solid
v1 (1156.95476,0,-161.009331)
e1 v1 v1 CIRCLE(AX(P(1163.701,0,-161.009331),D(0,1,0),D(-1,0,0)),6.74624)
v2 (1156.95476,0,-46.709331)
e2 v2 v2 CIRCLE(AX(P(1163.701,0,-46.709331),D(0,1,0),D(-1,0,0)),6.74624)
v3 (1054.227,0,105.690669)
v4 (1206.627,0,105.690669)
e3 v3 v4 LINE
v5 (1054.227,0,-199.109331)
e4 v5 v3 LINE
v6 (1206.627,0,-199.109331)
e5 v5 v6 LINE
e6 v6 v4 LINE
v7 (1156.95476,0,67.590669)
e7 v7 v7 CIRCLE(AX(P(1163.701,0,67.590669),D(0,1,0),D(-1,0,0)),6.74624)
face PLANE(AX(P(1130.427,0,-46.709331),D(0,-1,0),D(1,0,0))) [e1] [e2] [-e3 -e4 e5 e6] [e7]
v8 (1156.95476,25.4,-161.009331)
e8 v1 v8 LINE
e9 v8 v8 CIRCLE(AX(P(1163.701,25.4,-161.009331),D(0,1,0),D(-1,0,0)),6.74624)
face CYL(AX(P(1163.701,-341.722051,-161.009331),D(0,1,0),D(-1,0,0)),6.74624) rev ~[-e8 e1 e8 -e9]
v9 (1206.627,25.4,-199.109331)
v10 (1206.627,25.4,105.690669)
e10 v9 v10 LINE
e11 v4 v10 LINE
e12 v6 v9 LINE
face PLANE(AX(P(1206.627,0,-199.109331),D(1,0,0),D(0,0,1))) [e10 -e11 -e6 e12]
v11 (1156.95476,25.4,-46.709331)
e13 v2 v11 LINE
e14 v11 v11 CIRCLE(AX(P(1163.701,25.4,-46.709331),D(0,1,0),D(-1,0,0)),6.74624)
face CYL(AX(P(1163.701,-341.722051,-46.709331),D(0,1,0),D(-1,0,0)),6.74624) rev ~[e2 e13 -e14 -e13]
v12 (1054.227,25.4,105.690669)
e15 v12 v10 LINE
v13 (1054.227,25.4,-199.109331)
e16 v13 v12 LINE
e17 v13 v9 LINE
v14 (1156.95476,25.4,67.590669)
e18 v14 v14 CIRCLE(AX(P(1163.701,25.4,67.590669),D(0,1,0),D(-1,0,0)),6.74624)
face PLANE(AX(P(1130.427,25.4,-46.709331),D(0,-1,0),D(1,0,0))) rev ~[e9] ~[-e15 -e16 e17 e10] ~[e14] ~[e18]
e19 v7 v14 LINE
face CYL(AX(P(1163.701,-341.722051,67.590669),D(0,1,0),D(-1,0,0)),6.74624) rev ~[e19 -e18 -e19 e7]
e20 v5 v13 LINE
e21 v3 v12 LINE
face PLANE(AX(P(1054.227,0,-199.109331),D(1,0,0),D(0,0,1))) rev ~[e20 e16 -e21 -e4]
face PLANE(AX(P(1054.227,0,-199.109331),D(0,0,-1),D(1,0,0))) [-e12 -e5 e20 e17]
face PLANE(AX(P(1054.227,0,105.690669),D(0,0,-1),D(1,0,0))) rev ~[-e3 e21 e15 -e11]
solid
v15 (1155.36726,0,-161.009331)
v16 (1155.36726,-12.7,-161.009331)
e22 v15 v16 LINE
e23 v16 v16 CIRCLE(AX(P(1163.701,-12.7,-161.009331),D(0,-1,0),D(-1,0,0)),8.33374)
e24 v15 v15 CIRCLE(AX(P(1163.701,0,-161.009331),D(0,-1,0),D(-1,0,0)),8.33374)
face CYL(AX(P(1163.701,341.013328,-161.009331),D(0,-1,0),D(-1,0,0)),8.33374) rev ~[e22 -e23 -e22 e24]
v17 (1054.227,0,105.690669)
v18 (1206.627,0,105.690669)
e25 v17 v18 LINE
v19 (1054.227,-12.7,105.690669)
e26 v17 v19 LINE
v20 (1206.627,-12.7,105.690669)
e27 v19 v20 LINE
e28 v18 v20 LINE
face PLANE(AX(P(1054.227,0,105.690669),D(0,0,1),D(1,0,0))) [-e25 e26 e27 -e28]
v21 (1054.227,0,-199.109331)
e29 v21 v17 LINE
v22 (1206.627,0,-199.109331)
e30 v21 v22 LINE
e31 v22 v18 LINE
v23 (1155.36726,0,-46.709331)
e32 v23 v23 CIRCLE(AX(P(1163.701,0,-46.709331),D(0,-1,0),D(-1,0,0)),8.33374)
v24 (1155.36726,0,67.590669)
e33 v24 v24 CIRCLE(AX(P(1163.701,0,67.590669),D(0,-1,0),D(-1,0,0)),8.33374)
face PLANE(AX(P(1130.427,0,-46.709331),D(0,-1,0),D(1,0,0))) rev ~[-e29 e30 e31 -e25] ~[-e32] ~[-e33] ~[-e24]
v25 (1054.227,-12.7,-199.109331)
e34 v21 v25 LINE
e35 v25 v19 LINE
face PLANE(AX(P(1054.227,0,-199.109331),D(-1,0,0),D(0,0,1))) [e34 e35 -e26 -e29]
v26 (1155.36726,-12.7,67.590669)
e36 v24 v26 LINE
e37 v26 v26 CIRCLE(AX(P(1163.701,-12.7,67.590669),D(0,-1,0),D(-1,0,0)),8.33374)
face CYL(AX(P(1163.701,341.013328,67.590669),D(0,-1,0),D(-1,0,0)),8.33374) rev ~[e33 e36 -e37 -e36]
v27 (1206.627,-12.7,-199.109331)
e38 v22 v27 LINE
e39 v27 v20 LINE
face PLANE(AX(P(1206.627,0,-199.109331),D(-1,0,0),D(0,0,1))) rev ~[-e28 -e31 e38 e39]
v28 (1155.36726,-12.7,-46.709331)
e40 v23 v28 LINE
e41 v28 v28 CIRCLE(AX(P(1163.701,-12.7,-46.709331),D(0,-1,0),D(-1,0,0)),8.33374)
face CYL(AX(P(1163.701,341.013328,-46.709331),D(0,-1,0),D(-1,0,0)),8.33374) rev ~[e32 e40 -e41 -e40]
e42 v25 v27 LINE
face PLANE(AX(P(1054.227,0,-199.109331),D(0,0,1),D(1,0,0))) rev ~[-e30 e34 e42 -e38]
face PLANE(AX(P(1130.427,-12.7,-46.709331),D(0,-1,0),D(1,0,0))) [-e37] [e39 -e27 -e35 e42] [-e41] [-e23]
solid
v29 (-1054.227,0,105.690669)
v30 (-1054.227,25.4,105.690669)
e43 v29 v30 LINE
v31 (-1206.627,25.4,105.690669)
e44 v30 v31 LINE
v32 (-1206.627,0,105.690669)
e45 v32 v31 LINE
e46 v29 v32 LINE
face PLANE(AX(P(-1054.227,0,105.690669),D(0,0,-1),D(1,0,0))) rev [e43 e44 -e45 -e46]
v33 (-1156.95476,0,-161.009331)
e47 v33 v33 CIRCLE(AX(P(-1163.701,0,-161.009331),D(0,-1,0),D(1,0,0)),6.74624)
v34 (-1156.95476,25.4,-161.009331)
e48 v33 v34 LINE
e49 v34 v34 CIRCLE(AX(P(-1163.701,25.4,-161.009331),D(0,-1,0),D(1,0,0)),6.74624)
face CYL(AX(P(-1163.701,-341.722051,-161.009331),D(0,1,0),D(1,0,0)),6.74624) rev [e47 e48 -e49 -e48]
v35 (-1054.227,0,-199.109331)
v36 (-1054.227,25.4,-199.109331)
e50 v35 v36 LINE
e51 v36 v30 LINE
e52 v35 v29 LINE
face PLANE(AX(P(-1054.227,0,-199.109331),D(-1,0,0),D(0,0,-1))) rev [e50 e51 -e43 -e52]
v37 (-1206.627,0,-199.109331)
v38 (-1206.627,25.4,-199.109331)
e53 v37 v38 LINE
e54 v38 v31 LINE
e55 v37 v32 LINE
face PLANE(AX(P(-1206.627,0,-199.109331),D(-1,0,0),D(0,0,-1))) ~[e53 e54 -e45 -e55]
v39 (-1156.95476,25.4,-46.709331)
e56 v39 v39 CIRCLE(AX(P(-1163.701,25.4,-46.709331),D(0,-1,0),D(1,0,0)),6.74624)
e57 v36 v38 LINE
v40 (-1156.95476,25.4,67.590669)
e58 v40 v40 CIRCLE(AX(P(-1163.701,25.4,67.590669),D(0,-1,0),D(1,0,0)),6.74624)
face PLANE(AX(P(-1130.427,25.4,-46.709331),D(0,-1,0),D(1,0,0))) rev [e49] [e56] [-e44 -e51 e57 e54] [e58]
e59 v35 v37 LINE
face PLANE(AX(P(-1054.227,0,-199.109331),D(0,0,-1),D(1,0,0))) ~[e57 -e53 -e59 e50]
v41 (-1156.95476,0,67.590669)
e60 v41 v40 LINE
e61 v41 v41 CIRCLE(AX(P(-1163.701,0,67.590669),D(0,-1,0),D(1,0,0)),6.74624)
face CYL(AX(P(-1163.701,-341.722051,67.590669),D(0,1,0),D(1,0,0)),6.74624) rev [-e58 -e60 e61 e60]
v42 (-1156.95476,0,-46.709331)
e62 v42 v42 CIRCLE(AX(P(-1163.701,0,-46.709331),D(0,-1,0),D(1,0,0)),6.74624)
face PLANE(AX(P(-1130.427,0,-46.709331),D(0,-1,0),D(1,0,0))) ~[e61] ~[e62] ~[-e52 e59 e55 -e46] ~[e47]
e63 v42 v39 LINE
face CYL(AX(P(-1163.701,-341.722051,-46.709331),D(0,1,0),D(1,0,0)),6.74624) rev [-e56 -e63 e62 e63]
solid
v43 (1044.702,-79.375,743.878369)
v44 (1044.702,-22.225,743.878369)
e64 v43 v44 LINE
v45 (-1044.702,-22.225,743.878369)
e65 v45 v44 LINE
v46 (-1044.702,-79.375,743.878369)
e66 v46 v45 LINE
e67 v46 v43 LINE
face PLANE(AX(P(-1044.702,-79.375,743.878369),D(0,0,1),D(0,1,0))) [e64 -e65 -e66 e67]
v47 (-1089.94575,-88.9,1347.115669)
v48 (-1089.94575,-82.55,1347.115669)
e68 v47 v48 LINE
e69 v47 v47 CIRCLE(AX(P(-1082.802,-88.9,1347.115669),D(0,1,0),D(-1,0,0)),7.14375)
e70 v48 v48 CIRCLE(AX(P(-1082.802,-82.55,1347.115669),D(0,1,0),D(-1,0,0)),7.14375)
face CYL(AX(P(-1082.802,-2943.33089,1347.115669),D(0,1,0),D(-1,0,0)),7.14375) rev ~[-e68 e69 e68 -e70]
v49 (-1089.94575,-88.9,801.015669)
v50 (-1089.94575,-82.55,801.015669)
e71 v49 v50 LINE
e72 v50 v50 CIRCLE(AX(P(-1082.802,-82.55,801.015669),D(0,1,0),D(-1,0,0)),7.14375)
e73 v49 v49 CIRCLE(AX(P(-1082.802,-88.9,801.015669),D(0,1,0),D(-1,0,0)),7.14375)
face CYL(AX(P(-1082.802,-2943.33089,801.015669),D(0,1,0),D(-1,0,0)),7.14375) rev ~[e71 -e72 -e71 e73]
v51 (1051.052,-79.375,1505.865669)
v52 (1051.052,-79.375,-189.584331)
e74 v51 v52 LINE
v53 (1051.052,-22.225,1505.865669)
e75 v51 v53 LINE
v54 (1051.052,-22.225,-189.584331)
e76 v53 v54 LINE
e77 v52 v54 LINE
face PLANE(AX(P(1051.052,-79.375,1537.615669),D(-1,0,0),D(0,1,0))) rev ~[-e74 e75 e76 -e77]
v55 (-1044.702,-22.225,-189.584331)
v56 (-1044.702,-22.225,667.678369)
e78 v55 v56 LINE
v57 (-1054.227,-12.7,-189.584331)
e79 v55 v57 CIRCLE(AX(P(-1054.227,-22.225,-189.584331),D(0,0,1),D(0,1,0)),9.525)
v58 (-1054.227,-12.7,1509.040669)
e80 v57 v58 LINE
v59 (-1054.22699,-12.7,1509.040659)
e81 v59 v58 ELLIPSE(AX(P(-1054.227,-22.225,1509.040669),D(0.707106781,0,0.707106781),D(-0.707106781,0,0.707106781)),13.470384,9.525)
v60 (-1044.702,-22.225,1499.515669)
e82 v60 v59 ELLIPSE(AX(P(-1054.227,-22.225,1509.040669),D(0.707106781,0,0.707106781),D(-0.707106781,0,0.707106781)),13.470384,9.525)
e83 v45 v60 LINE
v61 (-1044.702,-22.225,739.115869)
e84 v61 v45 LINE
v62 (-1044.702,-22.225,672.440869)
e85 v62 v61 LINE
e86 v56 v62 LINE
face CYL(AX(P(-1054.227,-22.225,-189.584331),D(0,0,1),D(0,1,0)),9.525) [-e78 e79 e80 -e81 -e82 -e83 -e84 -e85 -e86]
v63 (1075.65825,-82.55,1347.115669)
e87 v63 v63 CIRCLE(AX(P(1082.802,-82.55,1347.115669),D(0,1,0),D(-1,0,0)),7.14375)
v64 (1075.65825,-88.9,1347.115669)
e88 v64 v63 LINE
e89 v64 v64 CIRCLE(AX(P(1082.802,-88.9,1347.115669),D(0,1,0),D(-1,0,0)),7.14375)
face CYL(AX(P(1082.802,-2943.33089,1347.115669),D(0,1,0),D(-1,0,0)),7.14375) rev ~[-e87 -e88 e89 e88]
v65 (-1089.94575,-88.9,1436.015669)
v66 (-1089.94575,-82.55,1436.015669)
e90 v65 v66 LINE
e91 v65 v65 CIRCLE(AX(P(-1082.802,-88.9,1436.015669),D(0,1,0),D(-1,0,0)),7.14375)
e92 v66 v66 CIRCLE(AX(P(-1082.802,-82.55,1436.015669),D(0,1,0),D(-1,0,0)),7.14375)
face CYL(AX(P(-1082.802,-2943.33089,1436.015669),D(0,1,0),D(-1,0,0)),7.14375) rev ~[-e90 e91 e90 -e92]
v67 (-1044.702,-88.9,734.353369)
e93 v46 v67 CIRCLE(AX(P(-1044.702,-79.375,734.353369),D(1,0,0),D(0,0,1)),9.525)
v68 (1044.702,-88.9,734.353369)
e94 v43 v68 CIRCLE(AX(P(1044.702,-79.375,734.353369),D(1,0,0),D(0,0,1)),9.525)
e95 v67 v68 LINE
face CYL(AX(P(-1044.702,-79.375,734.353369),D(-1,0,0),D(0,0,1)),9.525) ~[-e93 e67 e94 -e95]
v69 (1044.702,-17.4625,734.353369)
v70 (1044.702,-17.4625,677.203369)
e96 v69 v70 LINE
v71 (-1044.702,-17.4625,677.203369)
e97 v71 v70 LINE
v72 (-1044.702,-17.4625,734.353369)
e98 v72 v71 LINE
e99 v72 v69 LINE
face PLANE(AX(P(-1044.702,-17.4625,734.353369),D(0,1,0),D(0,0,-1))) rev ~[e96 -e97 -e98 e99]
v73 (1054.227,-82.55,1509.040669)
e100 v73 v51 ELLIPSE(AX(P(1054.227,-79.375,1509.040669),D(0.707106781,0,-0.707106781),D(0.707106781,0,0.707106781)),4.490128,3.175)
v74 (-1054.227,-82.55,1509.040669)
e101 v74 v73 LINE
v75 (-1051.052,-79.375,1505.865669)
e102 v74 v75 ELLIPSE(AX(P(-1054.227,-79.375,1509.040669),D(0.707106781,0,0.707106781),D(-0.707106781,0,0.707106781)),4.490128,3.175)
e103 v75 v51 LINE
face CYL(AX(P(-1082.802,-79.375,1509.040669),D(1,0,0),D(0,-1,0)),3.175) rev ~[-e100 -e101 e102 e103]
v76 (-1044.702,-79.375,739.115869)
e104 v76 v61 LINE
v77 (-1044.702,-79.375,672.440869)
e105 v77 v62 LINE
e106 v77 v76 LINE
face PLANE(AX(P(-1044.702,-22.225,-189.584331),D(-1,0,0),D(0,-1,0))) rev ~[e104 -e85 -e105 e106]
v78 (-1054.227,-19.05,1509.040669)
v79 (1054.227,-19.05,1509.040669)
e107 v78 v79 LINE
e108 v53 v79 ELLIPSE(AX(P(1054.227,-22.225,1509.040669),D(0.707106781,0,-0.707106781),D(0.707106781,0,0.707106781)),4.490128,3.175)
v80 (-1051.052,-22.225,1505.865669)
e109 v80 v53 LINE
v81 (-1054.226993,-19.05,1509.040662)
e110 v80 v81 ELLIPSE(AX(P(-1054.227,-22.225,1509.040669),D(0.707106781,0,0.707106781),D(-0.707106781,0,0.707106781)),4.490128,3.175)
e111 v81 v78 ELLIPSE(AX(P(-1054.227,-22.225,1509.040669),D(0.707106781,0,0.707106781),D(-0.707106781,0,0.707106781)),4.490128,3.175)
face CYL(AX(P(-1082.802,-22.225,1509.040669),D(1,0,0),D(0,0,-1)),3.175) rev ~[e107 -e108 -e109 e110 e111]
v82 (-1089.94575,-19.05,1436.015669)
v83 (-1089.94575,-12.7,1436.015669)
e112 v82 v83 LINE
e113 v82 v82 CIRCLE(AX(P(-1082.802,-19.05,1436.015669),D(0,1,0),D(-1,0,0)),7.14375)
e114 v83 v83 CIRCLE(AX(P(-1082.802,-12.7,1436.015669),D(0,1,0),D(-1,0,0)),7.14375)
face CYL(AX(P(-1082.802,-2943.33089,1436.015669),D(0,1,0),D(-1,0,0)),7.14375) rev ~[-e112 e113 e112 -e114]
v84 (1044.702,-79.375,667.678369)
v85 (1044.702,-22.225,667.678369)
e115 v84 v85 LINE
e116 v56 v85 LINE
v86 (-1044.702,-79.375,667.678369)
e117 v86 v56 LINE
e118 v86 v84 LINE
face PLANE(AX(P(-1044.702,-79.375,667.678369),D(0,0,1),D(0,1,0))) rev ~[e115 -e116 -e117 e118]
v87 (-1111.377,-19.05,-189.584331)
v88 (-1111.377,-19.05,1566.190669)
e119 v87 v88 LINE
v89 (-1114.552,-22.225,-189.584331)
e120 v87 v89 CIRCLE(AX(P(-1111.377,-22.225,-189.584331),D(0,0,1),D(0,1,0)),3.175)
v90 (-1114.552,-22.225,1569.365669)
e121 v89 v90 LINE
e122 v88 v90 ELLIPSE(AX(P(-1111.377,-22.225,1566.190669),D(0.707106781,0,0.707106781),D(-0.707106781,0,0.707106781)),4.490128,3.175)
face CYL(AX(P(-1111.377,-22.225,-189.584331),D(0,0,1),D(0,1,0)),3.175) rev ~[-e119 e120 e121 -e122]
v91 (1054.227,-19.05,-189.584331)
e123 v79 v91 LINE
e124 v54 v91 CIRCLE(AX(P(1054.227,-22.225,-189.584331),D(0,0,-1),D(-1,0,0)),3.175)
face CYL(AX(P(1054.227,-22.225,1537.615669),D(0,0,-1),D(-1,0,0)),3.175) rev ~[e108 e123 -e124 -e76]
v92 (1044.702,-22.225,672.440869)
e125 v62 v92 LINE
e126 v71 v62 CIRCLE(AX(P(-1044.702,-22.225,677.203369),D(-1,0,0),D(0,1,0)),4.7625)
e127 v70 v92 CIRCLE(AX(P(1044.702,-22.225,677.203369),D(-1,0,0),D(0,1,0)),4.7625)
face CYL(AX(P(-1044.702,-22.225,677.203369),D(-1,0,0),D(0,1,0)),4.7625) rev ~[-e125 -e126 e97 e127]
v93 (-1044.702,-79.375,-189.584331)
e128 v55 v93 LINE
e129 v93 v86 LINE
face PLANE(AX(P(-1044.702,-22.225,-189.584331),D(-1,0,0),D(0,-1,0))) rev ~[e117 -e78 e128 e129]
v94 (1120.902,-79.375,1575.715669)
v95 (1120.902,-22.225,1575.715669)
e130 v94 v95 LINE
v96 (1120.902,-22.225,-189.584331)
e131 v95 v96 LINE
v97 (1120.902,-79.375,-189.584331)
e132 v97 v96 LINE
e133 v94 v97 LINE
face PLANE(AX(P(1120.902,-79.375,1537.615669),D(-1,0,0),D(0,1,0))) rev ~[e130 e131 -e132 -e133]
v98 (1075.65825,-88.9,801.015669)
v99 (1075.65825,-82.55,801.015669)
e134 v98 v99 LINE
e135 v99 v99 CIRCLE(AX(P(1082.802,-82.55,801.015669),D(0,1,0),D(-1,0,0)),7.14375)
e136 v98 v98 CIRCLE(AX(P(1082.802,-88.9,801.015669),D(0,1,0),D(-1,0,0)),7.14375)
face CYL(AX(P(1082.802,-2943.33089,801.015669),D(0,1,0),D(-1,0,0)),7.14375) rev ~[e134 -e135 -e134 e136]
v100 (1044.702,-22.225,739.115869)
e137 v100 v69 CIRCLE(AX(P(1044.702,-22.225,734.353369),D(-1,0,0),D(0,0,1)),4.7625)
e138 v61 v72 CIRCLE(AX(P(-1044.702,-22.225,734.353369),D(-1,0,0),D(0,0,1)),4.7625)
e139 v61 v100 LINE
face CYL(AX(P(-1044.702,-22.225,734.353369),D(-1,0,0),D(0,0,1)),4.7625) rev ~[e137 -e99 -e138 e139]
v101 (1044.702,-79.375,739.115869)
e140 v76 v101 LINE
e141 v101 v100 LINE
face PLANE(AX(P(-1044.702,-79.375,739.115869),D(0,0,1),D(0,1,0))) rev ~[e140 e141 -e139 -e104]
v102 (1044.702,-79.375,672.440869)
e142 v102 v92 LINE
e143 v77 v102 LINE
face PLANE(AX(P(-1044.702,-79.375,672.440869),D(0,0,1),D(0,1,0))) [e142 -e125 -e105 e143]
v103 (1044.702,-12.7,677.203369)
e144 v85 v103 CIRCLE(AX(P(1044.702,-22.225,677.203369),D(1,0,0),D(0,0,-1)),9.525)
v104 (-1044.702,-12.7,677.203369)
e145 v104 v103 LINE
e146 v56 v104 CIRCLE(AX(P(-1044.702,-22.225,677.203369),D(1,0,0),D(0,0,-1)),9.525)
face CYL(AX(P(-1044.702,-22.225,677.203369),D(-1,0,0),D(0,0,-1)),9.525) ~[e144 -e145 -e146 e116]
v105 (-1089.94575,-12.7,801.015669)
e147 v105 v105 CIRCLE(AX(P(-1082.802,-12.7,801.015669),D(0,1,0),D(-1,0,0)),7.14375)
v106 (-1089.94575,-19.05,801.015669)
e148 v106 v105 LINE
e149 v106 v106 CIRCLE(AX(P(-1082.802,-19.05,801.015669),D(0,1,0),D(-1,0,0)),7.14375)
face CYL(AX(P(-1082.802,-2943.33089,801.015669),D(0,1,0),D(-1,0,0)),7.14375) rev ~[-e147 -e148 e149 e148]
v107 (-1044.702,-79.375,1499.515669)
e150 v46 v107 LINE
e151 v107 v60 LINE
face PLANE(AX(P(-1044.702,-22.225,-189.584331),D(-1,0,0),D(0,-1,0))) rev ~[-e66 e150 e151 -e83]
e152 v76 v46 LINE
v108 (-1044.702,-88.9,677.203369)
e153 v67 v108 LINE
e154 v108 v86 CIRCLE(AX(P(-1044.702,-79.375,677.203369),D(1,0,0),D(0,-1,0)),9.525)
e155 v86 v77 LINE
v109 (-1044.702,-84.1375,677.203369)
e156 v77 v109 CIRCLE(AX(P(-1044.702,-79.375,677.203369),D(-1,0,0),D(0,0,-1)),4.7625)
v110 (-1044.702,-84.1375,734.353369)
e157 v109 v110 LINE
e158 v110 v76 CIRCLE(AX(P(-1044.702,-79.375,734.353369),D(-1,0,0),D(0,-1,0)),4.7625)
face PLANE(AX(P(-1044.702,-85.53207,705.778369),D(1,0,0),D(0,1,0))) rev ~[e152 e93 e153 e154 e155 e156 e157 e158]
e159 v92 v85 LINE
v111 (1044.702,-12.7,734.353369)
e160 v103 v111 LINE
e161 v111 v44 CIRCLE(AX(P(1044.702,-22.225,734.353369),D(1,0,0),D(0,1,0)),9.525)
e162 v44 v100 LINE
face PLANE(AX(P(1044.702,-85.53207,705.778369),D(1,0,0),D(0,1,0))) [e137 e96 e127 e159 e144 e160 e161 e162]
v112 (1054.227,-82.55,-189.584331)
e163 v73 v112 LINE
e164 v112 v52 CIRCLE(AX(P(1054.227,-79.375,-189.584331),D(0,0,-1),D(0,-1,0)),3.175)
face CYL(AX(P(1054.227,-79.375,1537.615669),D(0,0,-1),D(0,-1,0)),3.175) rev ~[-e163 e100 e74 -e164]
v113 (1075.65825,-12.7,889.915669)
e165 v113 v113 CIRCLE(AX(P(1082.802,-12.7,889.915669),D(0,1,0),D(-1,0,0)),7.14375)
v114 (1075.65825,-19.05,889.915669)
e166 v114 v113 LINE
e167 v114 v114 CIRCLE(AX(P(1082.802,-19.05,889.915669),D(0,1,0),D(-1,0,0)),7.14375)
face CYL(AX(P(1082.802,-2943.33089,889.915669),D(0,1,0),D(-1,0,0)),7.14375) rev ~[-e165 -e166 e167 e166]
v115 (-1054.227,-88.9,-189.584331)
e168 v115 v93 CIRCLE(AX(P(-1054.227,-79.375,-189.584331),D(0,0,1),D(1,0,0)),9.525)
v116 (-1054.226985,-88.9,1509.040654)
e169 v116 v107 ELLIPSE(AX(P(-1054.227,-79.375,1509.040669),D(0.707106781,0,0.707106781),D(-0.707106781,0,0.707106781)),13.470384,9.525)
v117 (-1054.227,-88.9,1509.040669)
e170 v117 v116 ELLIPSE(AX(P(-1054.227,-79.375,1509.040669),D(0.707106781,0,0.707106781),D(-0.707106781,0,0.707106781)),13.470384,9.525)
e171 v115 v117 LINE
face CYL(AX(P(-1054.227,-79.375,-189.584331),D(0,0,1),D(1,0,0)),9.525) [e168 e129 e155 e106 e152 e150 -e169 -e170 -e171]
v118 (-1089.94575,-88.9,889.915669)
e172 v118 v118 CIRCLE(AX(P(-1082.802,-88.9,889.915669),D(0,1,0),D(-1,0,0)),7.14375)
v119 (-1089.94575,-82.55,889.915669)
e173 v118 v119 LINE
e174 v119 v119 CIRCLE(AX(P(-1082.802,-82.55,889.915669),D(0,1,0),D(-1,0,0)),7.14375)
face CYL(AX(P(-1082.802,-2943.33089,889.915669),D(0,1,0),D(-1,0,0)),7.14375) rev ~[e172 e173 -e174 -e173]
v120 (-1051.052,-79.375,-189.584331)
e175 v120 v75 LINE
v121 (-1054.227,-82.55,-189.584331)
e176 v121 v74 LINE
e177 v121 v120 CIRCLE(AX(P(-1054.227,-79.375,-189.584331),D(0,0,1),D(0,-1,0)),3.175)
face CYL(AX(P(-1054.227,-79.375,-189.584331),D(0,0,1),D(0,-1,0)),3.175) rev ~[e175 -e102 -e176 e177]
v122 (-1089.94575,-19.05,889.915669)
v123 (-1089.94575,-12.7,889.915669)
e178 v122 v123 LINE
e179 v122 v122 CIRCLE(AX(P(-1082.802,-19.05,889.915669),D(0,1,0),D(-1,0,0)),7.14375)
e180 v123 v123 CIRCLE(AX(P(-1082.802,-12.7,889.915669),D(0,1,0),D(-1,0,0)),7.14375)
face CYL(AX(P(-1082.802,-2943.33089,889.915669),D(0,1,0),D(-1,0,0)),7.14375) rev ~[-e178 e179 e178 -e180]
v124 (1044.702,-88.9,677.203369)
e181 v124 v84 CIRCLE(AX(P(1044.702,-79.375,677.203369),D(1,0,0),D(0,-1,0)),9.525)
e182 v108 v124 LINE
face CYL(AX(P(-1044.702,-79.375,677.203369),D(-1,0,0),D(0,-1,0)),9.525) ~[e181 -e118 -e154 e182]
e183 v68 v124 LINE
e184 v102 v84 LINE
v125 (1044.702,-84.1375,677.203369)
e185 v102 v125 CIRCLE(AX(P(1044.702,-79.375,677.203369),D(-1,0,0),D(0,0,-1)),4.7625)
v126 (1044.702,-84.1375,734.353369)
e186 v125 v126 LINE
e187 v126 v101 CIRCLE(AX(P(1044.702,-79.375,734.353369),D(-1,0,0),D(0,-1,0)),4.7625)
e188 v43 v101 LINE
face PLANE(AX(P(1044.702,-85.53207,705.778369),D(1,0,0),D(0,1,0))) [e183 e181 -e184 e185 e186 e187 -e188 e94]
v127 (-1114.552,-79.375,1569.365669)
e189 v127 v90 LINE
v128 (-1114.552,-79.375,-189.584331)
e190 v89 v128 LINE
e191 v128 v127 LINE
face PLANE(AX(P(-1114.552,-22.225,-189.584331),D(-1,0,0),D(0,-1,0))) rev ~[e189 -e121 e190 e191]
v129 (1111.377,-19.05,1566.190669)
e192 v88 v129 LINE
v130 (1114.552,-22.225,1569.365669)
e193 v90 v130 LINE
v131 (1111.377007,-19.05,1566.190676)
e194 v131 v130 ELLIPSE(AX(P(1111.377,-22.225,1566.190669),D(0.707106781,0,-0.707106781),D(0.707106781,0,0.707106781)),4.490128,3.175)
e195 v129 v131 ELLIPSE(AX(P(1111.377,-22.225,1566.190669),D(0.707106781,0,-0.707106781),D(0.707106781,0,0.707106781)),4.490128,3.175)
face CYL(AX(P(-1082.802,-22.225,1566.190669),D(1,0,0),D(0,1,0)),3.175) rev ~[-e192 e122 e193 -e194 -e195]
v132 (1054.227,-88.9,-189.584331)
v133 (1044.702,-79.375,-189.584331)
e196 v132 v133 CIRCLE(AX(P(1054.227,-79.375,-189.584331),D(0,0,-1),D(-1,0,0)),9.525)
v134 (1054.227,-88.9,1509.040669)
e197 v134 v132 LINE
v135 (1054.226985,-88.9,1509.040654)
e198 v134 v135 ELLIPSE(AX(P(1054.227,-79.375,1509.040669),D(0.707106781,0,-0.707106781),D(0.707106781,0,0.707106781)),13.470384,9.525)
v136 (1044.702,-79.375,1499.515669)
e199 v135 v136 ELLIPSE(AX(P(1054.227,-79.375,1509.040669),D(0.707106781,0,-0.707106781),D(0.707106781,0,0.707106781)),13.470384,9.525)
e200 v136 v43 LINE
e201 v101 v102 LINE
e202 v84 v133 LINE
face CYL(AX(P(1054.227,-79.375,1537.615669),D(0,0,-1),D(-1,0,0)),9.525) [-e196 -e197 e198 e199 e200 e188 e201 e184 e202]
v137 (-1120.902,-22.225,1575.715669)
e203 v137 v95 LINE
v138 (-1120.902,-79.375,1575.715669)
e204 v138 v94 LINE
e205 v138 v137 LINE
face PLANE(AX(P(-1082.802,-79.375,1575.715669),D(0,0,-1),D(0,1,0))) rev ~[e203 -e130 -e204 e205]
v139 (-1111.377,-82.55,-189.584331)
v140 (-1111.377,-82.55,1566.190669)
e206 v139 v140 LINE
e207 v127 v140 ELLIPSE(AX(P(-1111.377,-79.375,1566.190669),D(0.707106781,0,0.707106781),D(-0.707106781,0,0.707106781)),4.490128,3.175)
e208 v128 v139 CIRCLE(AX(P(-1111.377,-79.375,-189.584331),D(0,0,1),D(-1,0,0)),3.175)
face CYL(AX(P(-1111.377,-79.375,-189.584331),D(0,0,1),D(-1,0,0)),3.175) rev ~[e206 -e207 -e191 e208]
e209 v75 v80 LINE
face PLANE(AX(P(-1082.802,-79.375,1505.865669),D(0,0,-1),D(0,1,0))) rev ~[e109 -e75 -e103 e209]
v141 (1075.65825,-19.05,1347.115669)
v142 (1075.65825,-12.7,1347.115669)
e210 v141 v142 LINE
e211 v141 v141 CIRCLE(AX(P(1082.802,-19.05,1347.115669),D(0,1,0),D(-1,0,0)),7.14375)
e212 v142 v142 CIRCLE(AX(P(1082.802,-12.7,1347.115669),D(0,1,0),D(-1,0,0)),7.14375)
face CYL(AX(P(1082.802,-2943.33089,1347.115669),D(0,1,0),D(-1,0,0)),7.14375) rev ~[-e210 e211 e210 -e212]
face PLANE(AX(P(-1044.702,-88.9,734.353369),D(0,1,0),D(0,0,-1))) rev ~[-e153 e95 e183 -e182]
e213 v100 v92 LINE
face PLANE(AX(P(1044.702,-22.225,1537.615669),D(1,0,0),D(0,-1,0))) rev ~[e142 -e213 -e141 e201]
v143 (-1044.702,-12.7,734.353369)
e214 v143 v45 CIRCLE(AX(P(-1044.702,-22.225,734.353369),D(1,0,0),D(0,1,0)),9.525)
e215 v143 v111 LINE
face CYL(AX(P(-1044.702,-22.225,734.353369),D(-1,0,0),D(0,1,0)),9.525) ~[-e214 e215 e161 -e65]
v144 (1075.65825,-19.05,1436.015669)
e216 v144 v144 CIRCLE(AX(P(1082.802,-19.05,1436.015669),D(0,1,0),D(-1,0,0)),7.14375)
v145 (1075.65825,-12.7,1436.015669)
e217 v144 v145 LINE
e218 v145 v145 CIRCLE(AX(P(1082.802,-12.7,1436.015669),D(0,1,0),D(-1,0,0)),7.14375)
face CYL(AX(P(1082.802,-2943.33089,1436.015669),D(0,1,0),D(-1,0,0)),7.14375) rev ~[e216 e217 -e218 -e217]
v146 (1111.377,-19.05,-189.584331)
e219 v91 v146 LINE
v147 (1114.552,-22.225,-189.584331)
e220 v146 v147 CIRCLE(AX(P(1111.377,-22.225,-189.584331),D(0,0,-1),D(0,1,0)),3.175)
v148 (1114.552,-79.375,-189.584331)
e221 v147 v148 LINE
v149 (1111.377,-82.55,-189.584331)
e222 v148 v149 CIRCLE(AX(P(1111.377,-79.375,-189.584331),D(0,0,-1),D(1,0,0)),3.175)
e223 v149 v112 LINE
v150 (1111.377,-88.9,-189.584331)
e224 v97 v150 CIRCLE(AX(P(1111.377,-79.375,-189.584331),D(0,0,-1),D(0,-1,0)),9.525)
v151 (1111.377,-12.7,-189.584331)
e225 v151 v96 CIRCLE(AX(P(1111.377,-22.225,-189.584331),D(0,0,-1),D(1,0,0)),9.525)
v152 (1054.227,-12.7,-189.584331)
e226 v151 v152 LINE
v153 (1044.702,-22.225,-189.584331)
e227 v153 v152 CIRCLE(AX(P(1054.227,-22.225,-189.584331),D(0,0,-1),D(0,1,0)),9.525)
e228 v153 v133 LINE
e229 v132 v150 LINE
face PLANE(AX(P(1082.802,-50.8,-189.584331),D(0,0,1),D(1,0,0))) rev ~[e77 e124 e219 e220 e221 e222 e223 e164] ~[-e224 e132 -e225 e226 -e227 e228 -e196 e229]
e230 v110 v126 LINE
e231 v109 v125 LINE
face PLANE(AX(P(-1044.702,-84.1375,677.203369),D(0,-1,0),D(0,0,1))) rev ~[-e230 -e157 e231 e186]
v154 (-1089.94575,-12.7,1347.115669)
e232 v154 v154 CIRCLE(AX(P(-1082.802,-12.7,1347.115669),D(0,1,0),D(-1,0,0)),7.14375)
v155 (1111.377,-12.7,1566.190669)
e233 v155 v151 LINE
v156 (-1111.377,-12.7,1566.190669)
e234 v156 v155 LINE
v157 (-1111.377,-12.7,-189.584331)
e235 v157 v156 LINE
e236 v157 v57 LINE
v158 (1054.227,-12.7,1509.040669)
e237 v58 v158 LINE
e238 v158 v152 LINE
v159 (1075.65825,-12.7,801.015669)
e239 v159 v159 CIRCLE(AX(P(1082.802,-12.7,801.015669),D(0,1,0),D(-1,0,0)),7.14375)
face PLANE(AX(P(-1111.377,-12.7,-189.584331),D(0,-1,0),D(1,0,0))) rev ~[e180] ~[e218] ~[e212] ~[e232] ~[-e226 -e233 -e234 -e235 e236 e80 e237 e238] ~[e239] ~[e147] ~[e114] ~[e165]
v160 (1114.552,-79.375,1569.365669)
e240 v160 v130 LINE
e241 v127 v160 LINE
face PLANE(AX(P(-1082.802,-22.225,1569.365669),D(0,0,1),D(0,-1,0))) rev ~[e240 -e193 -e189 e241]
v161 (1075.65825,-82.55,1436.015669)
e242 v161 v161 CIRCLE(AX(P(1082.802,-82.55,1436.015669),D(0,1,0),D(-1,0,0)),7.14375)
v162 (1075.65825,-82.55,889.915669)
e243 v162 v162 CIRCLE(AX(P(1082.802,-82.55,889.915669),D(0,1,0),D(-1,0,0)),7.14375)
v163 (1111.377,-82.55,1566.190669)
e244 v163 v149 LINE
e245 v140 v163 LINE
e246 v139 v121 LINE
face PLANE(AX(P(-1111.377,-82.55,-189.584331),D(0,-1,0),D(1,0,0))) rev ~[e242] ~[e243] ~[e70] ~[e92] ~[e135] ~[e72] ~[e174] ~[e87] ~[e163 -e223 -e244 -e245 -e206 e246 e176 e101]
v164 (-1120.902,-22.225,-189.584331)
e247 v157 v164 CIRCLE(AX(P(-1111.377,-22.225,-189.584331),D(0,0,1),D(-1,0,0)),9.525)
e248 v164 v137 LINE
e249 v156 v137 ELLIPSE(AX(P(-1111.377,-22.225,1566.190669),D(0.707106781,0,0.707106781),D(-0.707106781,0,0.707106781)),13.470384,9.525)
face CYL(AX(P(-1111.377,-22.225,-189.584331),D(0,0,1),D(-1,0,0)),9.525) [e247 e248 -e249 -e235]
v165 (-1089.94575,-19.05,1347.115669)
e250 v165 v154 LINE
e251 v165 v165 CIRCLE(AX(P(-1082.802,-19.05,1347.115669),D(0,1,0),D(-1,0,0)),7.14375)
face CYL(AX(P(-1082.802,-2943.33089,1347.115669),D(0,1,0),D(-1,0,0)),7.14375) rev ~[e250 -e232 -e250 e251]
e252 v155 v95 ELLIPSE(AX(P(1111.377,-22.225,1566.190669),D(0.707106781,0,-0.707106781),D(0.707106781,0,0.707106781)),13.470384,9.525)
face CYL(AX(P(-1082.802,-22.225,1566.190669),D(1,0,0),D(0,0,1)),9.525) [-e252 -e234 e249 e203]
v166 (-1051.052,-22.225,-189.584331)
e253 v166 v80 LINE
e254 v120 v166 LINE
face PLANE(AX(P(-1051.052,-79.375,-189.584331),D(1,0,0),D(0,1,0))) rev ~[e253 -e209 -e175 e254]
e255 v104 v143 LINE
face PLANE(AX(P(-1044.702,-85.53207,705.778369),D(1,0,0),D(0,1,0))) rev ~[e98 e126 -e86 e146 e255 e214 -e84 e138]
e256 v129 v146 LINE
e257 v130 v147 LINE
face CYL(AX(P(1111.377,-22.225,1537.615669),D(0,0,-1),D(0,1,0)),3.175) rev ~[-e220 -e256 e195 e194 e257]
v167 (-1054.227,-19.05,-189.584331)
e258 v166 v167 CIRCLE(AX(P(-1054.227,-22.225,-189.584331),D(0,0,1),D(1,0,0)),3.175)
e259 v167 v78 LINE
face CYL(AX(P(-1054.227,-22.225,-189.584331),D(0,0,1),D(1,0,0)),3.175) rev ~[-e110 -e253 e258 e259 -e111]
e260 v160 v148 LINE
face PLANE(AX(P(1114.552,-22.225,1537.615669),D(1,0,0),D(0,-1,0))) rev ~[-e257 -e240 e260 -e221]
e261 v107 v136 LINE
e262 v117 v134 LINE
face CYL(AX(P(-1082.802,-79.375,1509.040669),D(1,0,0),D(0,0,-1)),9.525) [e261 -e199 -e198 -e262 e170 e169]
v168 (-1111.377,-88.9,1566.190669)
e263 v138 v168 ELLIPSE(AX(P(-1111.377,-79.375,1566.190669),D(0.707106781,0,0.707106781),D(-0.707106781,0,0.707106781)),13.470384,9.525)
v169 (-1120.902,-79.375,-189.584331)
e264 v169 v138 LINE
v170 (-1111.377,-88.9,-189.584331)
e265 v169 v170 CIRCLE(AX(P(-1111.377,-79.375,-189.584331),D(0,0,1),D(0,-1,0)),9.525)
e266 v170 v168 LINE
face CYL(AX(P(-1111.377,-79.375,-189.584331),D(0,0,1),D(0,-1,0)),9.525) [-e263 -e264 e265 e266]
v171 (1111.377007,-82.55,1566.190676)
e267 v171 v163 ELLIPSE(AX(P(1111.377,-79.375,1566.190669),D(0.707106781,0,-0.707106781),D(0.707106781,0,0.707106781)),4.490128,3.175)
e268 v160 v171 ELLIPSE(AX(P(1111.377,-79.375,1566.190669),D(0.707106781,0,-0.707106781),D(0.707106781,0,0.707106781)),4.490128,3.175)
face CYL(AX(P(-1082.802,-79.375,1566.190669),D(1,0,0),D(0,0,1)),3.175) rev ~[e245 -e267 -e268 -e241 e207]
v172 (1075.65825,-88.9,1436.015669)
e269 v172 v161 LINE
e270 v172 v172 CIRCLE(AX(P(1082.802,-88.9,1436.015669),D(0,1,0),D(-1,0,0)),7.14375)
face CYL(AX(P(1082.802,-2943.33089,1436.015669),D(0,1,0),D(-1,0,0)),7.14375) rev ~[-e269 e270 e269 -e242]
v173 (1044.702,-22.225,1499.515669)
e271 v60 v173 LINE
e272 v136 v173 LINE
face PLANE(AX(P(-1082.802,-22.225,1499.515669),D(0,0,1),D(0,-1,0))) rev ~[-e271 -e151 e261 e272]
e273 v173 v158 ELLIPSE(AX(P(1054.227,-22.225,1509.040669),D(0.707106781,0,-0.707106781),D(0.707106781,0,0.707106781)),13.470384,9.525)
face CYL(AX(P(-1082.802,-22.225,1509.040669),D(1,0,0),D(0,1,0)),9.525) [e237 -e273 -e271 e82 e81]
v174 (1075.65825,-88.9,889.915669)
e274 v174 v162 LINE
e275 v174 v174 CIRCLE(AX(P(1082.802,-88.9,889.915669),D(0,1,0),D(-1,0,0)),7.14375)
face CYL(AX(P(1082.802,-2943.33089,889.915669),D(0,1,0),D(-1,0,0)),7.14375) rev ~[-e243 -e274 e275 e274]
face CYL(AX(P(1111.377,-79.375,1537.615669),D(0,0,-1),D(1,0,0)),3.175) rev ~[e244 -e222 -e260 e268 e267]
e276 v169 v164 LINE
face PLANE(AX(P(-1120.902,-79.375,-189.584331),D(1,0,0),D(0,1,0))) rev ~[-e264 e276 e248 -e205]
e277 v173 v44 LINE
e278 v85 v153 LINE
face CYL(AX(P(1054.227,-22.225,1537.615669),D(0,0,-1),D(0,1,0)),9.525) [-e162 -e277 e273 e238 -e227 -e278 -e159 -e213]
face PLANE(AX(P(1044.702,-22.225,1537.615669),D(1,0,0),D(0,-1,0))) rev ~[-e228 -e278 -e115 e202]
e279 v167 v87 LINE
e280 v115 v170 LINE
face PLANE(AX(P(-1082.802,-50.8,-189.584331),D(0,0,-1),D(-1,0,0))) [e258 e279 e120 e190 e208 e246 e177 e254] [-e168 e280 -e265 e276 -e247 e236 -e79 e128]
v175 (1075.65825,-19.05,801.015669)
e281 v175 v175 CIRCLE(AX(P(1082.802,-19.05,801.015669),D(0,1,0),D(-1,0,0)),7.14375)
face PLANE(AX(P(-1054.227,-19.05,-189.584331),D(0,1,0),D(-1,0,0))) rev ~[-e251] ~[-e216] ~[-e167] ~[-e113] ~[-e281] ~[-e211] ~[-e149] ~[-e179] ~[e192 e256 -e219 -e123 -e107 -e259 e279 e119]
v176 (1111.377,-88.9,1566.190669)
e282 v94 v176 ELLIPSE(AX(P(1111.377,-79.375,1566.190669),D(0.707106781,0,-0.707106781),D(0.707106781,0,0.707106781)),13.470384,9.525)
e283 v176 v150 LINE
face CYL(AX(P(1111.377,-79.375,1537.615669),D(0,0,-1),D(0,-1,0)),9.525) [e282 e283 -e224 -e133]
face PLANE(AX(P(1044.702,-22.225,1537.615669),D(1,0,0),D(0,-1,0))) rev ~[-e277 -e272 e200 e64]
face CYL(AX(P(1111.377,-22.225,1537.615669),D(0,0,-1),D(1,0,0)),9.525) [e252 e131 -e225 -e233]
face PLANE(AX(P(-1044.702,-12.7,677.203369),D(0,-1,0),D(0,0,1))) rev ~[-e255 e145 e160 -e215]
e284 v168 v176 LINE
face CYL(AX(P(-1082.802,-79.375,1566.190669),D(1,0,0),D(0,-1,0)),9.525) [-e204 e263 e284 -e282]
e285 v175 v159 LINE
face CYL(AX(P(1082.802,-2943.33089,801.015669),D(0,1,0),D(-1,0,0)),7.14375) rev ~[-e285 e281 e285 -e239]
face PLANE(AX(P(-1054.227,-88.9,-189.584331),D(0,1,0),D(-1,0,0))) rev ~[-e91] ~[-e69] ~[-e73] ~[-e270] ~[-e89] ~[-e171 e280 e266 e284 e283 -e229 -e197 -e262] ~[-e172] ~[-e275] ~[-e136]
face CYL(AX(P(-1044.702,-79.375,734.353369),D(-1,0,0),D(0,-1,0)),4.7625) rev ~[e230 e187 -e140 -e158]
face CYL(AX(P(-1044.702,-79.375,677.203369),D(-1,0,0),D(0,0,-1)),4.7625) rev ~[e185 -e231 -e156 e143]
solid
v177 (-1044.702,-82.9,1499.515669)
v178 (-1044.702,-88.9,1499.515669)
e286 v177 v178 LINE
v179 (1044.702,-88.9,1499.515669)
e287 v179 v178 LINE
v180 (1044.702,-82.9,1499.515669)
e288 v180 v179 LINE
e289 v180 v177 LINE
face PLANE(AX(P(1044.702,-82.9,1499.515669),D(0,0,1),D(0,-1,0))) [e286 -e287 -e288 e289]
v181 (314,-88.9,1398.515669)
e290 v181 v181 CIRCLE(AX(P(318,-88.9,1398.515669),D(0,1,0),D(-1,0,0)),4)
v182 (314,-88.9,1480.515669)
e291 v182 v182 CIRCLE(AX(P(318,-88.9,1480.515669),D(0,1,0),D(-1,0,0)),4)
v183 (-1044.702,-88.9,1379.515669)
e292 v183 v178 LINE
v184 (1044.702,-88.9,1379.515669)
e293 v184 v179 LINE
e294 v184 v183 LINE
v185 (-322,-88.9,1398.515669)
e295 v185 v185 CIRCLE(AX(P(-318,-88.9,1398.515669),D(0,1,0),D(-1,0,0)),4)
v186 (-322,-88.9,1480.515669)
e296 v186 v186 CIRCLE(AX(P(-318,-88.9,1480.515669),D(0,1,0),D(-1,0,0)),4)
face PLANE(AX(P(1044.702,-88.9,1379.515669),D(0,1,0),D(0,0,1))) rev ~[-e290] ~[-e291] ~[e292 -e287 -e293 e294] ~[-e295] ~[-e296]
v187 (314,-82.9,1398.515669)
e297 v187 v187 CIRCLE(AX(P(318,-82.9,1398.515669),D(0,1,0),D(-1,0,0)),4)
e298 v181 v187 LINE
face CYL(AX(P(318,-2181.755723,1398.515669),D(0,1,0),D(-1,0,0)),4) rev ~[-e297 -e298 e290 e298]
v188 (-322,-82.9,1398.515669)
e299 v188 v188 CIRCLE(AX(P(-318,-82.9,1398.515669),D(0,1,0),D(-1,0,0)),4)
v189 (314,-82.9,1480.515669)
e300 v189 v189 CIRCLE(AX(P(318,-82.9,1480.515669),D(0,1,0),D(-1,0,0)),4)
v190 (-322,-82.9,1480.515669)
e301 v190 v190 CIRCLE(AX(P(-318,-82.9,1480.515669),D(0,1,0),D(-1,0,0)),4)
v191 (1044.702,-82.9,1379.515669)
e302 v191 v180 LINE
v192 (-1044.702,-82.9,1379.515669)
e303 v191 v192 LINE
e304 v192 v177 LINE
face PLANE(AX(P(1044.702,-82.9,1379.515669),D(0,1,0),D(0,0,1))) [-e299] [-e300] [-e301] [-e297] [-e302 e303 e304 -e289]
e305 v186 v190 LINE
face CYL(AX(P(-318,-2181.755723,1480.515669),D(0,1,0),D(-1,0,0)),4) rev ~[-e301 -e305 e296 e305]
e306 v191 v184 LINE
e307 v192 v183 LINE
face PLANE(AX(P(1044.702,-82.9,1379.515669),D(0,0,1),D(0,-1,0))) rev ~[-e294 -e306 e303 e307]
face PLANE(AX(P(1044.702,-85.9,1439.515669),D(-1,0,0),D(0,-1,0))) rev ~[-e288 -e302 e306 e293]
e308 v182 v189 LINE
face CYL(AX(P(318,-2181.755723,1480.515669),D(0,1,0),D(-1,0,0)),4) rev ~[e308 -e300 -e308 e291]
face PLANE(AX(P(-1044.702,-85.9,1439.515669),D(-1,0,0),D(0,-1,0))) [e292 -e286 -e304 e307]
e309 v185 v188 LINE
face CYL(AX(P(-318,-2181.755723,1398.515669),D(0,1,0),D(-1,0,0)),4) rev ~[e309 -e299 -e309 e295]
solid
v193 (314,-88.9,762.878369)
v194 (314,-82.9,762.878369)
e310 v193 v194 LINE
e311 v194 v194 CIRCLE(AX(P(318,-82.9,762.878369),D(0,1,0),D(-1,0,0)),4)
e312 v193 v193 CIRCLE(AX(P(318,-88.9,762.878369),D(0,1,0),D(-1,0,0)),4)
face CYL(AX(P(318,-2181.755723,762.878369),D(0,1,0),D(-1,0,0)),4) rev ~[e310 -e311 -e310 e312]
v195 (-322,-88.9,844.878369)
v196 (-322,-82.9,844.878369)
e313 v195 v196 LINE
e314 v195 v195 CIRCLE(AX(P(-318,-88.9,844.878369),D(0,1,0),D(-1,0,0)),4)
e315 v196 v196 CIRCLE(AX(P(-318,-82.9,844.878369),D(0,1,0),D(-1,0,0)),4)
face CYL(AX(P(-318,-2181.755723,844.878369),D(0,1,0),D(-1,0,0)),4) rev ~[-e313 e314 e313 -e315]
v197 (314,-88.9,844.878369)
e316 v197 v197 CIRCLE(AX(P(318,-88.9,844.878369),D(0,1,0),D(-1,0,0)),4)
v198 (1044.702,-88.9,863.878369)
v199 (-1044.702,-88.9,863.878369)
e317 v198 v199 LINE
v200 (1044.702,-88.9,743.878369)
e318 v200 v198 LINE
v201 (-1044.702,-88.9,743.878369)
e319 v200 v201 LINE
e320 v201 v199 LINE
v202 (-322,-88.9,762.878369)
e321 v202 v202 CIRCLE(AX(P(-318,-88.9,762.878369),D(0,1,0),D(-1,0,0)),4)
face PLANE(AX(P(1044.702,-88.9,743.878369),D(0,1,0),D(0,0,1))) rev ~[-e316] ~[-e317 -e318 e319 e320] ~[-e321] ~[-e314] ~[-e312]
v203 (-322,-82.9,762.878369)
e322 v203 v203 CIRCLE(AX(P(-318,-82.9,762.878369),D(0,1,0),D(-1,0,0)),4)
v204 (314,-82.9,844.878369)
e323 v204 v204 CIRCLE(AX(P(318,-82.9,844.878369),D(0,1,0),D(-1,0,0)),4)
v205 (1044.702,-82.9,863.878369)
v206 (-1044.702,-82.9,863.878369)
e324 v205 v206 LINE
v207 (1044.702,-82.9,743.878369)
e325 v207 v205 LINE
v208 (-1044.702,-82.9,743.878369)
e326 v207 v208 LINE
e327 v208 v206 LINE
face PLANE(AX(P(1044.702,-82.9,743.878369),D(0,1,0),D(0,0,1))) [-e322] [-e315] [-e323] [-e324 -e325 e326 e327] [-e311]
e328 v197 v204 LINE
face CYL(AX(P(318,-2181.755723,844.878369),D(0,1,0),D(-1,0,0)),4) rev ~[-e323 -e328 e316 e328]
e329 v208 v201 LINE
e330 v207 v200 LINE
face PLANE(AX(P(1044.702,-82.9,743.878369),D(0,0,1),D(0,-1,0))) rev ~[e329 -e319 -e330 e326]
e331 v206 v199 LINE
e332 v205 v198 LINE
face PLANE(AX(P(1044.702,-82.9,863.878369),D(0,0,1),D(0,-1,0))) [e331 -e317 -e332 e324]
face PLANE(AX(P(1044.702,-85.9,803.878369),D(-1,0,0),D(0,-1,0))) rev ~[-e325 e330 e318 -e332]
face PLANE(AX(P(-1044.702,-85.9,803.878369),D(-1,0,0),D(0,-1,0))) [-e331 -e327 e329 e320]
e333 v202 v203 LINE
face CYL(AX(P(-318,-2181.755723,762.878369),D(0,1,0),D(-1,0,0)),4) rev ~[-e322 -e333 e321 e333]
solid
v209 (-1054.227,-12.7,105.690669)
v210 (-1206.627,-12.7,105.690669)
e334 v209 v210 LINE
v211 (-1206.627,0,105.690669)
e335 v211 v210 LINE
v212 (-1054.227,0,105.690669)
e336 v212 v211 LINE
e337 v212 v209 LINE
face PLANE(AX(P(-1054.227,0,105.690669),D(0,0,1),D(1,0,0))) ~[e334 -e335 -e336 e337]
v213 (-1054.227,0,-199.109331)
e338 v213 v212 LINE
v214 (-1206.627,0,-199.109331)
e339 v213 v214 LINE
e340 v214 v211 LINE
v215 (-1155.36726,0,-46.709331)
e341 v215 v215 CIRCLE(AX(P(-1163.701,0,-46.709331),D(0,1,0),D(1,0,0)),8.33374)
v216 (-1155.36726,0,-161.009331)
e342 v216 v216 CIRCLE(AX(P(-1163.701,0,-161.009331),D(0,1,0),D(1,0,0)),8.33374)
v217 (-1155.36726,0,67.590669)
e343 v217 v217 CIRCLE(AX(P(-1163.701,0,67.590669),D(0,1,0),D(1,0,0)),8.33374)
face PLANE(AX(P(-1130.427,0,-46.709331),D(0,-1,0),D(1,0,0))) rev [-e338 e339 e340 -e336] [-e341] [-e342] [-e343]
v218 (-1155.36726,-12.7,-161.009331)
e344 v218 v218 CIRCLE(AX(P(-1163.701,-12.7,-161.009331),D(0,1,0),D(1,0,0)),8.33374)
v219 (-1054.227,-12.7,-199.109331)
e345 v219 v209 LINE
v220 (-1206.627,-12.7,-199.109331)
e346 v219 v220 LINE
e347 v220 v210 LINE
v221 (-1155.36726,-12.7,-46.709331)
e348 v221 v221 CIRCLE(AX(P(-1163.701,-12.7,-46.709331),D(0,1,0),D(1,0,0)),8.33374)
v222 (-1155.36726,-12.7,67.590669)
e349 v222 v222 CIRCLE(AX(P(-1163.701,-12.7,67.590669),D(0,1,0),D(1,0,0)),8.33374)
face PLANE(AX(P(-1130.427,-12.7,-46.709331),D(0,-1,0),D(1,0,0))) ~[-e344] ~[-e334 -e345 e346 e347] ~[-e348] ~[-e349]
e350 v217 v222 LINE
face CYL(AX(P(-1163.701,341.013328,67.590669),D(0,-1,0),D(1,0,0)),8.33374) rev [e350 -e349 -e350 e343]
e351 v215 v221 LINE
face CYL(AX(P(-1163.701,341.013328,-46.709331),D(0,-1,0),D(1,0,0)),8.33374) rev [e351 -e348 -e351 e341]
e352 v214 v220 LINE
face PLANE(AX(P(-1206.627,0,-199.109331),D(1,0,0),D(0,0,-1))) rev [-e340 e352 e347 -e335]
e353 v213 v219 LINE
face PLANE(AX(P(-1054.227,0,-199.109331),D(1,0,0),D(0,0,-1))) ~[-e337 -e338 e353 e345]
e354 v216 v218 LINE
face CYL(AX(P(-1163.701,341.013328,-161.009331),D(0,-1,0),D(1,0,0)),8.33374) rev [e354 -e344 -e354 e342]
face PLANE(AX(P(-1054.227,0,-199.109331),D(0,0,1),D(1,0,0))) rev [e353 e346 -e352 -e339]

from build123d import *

# Parameters (mm, degrees)
F0_W      = 152.4
F0_H      = 304.8
F1_DEPTH  = 25.4
F3_D      = 13.49248
F4_W      = 152.4
F4_H      = 304.8
F5_DEPTH  = 12.7
F6_D      = 16.66748
F15_W     = 57.15
F15_H     = 4.7625
F16_DEPTH = 2089.404
F17_W     = 6
F17_H     = 120
F18_DEPTH = 2089.404
F20_D     = 8
F20_2_D   = 8
F22_D     = 14.2875


# Not quite as in the source:
# - a length typed as a fraction of an inch, garbled in the dataset ("3 / 203.2 mm" for 3/8 in), is restored


with BuildPart() as f1:
    # F0 (on Front) → F1 (new body)
    with BuildSketch(Plane.XZ):
        with Locations((1130.427, -46.7093307734)):
            Rectangle(F0_W, F0_H)
    extrude(amount=-F1_DEPTH)

    # F3 (through all)
    with Locations(Plane.XZ):
        with Locations((1163.701, 67.5906692266), (1163.701, -46.7093307734), (1163.701, -161.0093307734)):
            Hole(F3_D / 2)


with BuildPart() as f5:
    # F4 (on face) → F5 (new body)
    with BuildSketch(Plane.XZ):
        with Locations((1130.427, -46.7093307734)):
            Rectangle(F4_W, F4_H)
    extrude(amount=F5_DEPTH)

    # F6 (through all)
    with Locations(Plane(origin=(0, 0, 0), x_dir=(1, 0, 0), z_dir=(0, 1, 0))):
        with Locations((1163.701, -67.5906692266), (1163.701, 46.7093307734), (1163.701, 161.0093307734)):
            Hole(F6_D / 2)


with BuildPart() as f7_1:
    # F7: instance of F1
    add(f1.part.mirror(Plane.YZ))


with BuildPart() as f7_2:
    # F7: instance of F5
    add(f5.part.mirror(Plane.YZ))


with BuildPart() as f12:
    # F12: sweep along a path in F9
    with BuildLine(Plane.XZ.offset(50.8)) as f12_path:
        Line((-1082.802, -189.5843307734), (-1082.802, 1537.6156692266))
        Line((-1082.802, 1537.6156692266), (1082.802, 1537.6156692266))
        Line((1082.802, 1537.6156692266), (1082.802, -189.5843307734))
    # F11 (on offset) → F12 (sweep)
    with BuildSketch(Plane(origin=(0, 0, -189.5843307734), x_dir=(1, 0, 0), z_dir=(0, 0, -1))):
        with BuildLine():
            Line((-1054.227, 88.9), (-1111.377, 88.9))
            ThreePointArc((-1111.377, 88.9), (-1118.1121920908, 86.1101920908), (-1120.902, 79.375))
            Line((-1120.902, 79.375), (-1120.902, 22.225))
            ThreePointArc((-1120.902, 22.225), (-1118.1121920908, 15.4898079092), (-1111.377, 12.7))
            Line((-1111.377, 12.7), (-1054.227, 12.7))
            ThreePointArc((-1054.227, 12.7), (-1047.4918079092, 15.4898079092), (-1044.702, 22.225))
            Line((-1044.702, 22.225), (-1044.702, 79.375))
            ThreePointArc((-1044.702, 79.375), (-1047.4918079092, 86.1101920908), (-1054.227, 88.9))
        make_face()
        with BuildLine():
            ThreePointArc((-1114.552, 79.375), (-1113.6220640303, 81.6200640303), (-1111.377, 82.55))
            Line((-1111.377, 82.55), (-1054.227, 82.55))
            ThreePointArc((-1054.227, 82.55), (-1051.9819359697, 81.6200640303), (-1051.052, 79.375))
            Line((-1051.052, 79.375), (-1051.052, 22.225))
            ThreePointArc((-1051.052, 22.225), (-1051.9819359697, 19.9799359697), (-1054.227, 19.05))
            Line((-1054.227, 19.05), (-1111.377, 19.05))
            ThreePointArc((-1111.377, 19.05), (-1113.6220640303, 19.9799359697), (-1114.552, 22.225))
            Line((-1114.552, 22.225), (-1114.552, 79.375))
        make_face(mode=Mode.SUBTRACT)
    sweep(path=f12_path.line, transition=Transition.RIGHT)

    # F15 (on face) → F16 (join, through all)
    with BuildSketch(Plane.YZ.offset(-1044.702)):
        with BuildLine():
            Line((-79.375, 739.1158692266), (-79.375, 743.8783692266))
            ThreePointArc((-79.375, 743.8783692266), (-86.1101920908, 741.0885613174), (-88.9, 734.3533692266))
            Line((-88.9, 734.3533692266), (-88.9, 677.2033692266))
            ThreePointArc((-88.9, 677.2033692266), (-86.1101920908, 670.4681771358), (-79.375, 667.6783692266))
            Line((-79.375, 667.6783692266), (-79.375, 672.4408692266))
            ThreePointArc((-79.375, 672.4408692266), (-82.7425960454, 673.8357731812), (-84.1375, 677.2033692266))
            Line((-84.1375, 677.2033692266), (-84.1375, 734.3533692266))
            ThreePointArc((-84.1375, 734.3533692266), (-82.7425960454, 737.720965272), (-79.375, 739.1158692266))
        make_face()
        with Locations((-50.8, 741.4971192266)):
            Rectangle(F15_W, F15_H)
        with BuildLine():
            ThreePointArc((-12.7, 734.3533692266), (-15.4898079092, 741.0885613174), (-22.225, 743.8783692266))
            Line((-22.225, 743.8783692266), (-22.225, 739.1158692266))
            ThreePointArc((-22.225, 739.1158692266), (-18.8574039546, 737.720965272), (-17.4625, 734.3533692266))
            Line((-17.4625, 734.3533692266), (-17.4625, 677.2033692266))
            ThreePointArc((-17.4625, 677.2033692266), (-18.8574039546, 673.8357731812), (-22.225, 672.4408692266))
            Line((-22.225, 672.4408692266), (-22.225, 667.6783692266))
            ThreePointArc((-22.225, 667.6783692266), (-15.4898079092, 670.4681771358), (-12.7, 677.2033692266))
            Line((-12.7, 677.2033692266), (-12.7, 734.3533692266))
        make_face()
        with Locations((-50.8, 670.0596192266)):
            Rectangle(F15_W, F15_H)
    extrude(amount=F16_DEPTH)

    # F22 (through all)
    with Locations(Plane.XZ.offset(88.9)):
        with Locations((-1082.802, 1436.0156692266), (-1082.802, 1347.1156692266), (-1082.802, 889.9156692266), (-1082.802, 801.0156692266), (1082.802, 1436.0156692266), (1082.802, 1347.1156692266), (1082.802, 889.9156692266), (1082.802, 801.0156692266)):
            Hole(F22_D / 2)


with BuildPart() as f18:
    # F17 (on face) → F18 (new body, through all)
    with BuildSketch(Plane(origin=(1044.702, 0, 0), x_dir=(0, -1, 0), z_dir=(-1, 0, 0))):
        with Locations((85.9, 1439.5156692266)):
            Rectangle(F17_W, F17_H)
    extrude(amount=F18_DEPTH)

    # F20 (through all)
    with Locations(Plane.XZ.offset(88.9)):
        with Locations((-318, 844.8783692266), (-318, 762.8783692266), (318, 844.8783692266), (318, 762.8783692266), (-318, 1480.5156692266), (-318, 1398.5156692266), (318, 1480.5156692266), (318, 1398.5156692266)):
            Hole(F20_D / 2)


with BuildPart() as f18b:
    # F17 (on face) → F18, piece 2 (new body, through all)
    with BuildSketch(Plane(origin=(1044.702, 0, 0), x_dir=(0, -1, 0), z_dir=(-1, 0, 0))):
        with Locations((85.9, 803.8783692266)):
            Rectangle(F17_W, F17_H)
    extrude(amount=F18_DEPTH)

    # F20#2 (through all)
    with Locations(Plane.XZ.offset(88.9)):
        with Locations((-318, 844.8783692266), (-318, 762.8783692266), (318, 844.8783692266), (318, 762.8783692266), (-318, 1480.5156692266), (-318, 1398.5156692266), (318, 1480.5156692266), (318, 1398.5156692266)):
            Hole(F20_2_D / 2)


solid = Compound([f1.part, f5.part, f7_1.part, f7_2.part, f12.part, f18.part, f18b.part])
